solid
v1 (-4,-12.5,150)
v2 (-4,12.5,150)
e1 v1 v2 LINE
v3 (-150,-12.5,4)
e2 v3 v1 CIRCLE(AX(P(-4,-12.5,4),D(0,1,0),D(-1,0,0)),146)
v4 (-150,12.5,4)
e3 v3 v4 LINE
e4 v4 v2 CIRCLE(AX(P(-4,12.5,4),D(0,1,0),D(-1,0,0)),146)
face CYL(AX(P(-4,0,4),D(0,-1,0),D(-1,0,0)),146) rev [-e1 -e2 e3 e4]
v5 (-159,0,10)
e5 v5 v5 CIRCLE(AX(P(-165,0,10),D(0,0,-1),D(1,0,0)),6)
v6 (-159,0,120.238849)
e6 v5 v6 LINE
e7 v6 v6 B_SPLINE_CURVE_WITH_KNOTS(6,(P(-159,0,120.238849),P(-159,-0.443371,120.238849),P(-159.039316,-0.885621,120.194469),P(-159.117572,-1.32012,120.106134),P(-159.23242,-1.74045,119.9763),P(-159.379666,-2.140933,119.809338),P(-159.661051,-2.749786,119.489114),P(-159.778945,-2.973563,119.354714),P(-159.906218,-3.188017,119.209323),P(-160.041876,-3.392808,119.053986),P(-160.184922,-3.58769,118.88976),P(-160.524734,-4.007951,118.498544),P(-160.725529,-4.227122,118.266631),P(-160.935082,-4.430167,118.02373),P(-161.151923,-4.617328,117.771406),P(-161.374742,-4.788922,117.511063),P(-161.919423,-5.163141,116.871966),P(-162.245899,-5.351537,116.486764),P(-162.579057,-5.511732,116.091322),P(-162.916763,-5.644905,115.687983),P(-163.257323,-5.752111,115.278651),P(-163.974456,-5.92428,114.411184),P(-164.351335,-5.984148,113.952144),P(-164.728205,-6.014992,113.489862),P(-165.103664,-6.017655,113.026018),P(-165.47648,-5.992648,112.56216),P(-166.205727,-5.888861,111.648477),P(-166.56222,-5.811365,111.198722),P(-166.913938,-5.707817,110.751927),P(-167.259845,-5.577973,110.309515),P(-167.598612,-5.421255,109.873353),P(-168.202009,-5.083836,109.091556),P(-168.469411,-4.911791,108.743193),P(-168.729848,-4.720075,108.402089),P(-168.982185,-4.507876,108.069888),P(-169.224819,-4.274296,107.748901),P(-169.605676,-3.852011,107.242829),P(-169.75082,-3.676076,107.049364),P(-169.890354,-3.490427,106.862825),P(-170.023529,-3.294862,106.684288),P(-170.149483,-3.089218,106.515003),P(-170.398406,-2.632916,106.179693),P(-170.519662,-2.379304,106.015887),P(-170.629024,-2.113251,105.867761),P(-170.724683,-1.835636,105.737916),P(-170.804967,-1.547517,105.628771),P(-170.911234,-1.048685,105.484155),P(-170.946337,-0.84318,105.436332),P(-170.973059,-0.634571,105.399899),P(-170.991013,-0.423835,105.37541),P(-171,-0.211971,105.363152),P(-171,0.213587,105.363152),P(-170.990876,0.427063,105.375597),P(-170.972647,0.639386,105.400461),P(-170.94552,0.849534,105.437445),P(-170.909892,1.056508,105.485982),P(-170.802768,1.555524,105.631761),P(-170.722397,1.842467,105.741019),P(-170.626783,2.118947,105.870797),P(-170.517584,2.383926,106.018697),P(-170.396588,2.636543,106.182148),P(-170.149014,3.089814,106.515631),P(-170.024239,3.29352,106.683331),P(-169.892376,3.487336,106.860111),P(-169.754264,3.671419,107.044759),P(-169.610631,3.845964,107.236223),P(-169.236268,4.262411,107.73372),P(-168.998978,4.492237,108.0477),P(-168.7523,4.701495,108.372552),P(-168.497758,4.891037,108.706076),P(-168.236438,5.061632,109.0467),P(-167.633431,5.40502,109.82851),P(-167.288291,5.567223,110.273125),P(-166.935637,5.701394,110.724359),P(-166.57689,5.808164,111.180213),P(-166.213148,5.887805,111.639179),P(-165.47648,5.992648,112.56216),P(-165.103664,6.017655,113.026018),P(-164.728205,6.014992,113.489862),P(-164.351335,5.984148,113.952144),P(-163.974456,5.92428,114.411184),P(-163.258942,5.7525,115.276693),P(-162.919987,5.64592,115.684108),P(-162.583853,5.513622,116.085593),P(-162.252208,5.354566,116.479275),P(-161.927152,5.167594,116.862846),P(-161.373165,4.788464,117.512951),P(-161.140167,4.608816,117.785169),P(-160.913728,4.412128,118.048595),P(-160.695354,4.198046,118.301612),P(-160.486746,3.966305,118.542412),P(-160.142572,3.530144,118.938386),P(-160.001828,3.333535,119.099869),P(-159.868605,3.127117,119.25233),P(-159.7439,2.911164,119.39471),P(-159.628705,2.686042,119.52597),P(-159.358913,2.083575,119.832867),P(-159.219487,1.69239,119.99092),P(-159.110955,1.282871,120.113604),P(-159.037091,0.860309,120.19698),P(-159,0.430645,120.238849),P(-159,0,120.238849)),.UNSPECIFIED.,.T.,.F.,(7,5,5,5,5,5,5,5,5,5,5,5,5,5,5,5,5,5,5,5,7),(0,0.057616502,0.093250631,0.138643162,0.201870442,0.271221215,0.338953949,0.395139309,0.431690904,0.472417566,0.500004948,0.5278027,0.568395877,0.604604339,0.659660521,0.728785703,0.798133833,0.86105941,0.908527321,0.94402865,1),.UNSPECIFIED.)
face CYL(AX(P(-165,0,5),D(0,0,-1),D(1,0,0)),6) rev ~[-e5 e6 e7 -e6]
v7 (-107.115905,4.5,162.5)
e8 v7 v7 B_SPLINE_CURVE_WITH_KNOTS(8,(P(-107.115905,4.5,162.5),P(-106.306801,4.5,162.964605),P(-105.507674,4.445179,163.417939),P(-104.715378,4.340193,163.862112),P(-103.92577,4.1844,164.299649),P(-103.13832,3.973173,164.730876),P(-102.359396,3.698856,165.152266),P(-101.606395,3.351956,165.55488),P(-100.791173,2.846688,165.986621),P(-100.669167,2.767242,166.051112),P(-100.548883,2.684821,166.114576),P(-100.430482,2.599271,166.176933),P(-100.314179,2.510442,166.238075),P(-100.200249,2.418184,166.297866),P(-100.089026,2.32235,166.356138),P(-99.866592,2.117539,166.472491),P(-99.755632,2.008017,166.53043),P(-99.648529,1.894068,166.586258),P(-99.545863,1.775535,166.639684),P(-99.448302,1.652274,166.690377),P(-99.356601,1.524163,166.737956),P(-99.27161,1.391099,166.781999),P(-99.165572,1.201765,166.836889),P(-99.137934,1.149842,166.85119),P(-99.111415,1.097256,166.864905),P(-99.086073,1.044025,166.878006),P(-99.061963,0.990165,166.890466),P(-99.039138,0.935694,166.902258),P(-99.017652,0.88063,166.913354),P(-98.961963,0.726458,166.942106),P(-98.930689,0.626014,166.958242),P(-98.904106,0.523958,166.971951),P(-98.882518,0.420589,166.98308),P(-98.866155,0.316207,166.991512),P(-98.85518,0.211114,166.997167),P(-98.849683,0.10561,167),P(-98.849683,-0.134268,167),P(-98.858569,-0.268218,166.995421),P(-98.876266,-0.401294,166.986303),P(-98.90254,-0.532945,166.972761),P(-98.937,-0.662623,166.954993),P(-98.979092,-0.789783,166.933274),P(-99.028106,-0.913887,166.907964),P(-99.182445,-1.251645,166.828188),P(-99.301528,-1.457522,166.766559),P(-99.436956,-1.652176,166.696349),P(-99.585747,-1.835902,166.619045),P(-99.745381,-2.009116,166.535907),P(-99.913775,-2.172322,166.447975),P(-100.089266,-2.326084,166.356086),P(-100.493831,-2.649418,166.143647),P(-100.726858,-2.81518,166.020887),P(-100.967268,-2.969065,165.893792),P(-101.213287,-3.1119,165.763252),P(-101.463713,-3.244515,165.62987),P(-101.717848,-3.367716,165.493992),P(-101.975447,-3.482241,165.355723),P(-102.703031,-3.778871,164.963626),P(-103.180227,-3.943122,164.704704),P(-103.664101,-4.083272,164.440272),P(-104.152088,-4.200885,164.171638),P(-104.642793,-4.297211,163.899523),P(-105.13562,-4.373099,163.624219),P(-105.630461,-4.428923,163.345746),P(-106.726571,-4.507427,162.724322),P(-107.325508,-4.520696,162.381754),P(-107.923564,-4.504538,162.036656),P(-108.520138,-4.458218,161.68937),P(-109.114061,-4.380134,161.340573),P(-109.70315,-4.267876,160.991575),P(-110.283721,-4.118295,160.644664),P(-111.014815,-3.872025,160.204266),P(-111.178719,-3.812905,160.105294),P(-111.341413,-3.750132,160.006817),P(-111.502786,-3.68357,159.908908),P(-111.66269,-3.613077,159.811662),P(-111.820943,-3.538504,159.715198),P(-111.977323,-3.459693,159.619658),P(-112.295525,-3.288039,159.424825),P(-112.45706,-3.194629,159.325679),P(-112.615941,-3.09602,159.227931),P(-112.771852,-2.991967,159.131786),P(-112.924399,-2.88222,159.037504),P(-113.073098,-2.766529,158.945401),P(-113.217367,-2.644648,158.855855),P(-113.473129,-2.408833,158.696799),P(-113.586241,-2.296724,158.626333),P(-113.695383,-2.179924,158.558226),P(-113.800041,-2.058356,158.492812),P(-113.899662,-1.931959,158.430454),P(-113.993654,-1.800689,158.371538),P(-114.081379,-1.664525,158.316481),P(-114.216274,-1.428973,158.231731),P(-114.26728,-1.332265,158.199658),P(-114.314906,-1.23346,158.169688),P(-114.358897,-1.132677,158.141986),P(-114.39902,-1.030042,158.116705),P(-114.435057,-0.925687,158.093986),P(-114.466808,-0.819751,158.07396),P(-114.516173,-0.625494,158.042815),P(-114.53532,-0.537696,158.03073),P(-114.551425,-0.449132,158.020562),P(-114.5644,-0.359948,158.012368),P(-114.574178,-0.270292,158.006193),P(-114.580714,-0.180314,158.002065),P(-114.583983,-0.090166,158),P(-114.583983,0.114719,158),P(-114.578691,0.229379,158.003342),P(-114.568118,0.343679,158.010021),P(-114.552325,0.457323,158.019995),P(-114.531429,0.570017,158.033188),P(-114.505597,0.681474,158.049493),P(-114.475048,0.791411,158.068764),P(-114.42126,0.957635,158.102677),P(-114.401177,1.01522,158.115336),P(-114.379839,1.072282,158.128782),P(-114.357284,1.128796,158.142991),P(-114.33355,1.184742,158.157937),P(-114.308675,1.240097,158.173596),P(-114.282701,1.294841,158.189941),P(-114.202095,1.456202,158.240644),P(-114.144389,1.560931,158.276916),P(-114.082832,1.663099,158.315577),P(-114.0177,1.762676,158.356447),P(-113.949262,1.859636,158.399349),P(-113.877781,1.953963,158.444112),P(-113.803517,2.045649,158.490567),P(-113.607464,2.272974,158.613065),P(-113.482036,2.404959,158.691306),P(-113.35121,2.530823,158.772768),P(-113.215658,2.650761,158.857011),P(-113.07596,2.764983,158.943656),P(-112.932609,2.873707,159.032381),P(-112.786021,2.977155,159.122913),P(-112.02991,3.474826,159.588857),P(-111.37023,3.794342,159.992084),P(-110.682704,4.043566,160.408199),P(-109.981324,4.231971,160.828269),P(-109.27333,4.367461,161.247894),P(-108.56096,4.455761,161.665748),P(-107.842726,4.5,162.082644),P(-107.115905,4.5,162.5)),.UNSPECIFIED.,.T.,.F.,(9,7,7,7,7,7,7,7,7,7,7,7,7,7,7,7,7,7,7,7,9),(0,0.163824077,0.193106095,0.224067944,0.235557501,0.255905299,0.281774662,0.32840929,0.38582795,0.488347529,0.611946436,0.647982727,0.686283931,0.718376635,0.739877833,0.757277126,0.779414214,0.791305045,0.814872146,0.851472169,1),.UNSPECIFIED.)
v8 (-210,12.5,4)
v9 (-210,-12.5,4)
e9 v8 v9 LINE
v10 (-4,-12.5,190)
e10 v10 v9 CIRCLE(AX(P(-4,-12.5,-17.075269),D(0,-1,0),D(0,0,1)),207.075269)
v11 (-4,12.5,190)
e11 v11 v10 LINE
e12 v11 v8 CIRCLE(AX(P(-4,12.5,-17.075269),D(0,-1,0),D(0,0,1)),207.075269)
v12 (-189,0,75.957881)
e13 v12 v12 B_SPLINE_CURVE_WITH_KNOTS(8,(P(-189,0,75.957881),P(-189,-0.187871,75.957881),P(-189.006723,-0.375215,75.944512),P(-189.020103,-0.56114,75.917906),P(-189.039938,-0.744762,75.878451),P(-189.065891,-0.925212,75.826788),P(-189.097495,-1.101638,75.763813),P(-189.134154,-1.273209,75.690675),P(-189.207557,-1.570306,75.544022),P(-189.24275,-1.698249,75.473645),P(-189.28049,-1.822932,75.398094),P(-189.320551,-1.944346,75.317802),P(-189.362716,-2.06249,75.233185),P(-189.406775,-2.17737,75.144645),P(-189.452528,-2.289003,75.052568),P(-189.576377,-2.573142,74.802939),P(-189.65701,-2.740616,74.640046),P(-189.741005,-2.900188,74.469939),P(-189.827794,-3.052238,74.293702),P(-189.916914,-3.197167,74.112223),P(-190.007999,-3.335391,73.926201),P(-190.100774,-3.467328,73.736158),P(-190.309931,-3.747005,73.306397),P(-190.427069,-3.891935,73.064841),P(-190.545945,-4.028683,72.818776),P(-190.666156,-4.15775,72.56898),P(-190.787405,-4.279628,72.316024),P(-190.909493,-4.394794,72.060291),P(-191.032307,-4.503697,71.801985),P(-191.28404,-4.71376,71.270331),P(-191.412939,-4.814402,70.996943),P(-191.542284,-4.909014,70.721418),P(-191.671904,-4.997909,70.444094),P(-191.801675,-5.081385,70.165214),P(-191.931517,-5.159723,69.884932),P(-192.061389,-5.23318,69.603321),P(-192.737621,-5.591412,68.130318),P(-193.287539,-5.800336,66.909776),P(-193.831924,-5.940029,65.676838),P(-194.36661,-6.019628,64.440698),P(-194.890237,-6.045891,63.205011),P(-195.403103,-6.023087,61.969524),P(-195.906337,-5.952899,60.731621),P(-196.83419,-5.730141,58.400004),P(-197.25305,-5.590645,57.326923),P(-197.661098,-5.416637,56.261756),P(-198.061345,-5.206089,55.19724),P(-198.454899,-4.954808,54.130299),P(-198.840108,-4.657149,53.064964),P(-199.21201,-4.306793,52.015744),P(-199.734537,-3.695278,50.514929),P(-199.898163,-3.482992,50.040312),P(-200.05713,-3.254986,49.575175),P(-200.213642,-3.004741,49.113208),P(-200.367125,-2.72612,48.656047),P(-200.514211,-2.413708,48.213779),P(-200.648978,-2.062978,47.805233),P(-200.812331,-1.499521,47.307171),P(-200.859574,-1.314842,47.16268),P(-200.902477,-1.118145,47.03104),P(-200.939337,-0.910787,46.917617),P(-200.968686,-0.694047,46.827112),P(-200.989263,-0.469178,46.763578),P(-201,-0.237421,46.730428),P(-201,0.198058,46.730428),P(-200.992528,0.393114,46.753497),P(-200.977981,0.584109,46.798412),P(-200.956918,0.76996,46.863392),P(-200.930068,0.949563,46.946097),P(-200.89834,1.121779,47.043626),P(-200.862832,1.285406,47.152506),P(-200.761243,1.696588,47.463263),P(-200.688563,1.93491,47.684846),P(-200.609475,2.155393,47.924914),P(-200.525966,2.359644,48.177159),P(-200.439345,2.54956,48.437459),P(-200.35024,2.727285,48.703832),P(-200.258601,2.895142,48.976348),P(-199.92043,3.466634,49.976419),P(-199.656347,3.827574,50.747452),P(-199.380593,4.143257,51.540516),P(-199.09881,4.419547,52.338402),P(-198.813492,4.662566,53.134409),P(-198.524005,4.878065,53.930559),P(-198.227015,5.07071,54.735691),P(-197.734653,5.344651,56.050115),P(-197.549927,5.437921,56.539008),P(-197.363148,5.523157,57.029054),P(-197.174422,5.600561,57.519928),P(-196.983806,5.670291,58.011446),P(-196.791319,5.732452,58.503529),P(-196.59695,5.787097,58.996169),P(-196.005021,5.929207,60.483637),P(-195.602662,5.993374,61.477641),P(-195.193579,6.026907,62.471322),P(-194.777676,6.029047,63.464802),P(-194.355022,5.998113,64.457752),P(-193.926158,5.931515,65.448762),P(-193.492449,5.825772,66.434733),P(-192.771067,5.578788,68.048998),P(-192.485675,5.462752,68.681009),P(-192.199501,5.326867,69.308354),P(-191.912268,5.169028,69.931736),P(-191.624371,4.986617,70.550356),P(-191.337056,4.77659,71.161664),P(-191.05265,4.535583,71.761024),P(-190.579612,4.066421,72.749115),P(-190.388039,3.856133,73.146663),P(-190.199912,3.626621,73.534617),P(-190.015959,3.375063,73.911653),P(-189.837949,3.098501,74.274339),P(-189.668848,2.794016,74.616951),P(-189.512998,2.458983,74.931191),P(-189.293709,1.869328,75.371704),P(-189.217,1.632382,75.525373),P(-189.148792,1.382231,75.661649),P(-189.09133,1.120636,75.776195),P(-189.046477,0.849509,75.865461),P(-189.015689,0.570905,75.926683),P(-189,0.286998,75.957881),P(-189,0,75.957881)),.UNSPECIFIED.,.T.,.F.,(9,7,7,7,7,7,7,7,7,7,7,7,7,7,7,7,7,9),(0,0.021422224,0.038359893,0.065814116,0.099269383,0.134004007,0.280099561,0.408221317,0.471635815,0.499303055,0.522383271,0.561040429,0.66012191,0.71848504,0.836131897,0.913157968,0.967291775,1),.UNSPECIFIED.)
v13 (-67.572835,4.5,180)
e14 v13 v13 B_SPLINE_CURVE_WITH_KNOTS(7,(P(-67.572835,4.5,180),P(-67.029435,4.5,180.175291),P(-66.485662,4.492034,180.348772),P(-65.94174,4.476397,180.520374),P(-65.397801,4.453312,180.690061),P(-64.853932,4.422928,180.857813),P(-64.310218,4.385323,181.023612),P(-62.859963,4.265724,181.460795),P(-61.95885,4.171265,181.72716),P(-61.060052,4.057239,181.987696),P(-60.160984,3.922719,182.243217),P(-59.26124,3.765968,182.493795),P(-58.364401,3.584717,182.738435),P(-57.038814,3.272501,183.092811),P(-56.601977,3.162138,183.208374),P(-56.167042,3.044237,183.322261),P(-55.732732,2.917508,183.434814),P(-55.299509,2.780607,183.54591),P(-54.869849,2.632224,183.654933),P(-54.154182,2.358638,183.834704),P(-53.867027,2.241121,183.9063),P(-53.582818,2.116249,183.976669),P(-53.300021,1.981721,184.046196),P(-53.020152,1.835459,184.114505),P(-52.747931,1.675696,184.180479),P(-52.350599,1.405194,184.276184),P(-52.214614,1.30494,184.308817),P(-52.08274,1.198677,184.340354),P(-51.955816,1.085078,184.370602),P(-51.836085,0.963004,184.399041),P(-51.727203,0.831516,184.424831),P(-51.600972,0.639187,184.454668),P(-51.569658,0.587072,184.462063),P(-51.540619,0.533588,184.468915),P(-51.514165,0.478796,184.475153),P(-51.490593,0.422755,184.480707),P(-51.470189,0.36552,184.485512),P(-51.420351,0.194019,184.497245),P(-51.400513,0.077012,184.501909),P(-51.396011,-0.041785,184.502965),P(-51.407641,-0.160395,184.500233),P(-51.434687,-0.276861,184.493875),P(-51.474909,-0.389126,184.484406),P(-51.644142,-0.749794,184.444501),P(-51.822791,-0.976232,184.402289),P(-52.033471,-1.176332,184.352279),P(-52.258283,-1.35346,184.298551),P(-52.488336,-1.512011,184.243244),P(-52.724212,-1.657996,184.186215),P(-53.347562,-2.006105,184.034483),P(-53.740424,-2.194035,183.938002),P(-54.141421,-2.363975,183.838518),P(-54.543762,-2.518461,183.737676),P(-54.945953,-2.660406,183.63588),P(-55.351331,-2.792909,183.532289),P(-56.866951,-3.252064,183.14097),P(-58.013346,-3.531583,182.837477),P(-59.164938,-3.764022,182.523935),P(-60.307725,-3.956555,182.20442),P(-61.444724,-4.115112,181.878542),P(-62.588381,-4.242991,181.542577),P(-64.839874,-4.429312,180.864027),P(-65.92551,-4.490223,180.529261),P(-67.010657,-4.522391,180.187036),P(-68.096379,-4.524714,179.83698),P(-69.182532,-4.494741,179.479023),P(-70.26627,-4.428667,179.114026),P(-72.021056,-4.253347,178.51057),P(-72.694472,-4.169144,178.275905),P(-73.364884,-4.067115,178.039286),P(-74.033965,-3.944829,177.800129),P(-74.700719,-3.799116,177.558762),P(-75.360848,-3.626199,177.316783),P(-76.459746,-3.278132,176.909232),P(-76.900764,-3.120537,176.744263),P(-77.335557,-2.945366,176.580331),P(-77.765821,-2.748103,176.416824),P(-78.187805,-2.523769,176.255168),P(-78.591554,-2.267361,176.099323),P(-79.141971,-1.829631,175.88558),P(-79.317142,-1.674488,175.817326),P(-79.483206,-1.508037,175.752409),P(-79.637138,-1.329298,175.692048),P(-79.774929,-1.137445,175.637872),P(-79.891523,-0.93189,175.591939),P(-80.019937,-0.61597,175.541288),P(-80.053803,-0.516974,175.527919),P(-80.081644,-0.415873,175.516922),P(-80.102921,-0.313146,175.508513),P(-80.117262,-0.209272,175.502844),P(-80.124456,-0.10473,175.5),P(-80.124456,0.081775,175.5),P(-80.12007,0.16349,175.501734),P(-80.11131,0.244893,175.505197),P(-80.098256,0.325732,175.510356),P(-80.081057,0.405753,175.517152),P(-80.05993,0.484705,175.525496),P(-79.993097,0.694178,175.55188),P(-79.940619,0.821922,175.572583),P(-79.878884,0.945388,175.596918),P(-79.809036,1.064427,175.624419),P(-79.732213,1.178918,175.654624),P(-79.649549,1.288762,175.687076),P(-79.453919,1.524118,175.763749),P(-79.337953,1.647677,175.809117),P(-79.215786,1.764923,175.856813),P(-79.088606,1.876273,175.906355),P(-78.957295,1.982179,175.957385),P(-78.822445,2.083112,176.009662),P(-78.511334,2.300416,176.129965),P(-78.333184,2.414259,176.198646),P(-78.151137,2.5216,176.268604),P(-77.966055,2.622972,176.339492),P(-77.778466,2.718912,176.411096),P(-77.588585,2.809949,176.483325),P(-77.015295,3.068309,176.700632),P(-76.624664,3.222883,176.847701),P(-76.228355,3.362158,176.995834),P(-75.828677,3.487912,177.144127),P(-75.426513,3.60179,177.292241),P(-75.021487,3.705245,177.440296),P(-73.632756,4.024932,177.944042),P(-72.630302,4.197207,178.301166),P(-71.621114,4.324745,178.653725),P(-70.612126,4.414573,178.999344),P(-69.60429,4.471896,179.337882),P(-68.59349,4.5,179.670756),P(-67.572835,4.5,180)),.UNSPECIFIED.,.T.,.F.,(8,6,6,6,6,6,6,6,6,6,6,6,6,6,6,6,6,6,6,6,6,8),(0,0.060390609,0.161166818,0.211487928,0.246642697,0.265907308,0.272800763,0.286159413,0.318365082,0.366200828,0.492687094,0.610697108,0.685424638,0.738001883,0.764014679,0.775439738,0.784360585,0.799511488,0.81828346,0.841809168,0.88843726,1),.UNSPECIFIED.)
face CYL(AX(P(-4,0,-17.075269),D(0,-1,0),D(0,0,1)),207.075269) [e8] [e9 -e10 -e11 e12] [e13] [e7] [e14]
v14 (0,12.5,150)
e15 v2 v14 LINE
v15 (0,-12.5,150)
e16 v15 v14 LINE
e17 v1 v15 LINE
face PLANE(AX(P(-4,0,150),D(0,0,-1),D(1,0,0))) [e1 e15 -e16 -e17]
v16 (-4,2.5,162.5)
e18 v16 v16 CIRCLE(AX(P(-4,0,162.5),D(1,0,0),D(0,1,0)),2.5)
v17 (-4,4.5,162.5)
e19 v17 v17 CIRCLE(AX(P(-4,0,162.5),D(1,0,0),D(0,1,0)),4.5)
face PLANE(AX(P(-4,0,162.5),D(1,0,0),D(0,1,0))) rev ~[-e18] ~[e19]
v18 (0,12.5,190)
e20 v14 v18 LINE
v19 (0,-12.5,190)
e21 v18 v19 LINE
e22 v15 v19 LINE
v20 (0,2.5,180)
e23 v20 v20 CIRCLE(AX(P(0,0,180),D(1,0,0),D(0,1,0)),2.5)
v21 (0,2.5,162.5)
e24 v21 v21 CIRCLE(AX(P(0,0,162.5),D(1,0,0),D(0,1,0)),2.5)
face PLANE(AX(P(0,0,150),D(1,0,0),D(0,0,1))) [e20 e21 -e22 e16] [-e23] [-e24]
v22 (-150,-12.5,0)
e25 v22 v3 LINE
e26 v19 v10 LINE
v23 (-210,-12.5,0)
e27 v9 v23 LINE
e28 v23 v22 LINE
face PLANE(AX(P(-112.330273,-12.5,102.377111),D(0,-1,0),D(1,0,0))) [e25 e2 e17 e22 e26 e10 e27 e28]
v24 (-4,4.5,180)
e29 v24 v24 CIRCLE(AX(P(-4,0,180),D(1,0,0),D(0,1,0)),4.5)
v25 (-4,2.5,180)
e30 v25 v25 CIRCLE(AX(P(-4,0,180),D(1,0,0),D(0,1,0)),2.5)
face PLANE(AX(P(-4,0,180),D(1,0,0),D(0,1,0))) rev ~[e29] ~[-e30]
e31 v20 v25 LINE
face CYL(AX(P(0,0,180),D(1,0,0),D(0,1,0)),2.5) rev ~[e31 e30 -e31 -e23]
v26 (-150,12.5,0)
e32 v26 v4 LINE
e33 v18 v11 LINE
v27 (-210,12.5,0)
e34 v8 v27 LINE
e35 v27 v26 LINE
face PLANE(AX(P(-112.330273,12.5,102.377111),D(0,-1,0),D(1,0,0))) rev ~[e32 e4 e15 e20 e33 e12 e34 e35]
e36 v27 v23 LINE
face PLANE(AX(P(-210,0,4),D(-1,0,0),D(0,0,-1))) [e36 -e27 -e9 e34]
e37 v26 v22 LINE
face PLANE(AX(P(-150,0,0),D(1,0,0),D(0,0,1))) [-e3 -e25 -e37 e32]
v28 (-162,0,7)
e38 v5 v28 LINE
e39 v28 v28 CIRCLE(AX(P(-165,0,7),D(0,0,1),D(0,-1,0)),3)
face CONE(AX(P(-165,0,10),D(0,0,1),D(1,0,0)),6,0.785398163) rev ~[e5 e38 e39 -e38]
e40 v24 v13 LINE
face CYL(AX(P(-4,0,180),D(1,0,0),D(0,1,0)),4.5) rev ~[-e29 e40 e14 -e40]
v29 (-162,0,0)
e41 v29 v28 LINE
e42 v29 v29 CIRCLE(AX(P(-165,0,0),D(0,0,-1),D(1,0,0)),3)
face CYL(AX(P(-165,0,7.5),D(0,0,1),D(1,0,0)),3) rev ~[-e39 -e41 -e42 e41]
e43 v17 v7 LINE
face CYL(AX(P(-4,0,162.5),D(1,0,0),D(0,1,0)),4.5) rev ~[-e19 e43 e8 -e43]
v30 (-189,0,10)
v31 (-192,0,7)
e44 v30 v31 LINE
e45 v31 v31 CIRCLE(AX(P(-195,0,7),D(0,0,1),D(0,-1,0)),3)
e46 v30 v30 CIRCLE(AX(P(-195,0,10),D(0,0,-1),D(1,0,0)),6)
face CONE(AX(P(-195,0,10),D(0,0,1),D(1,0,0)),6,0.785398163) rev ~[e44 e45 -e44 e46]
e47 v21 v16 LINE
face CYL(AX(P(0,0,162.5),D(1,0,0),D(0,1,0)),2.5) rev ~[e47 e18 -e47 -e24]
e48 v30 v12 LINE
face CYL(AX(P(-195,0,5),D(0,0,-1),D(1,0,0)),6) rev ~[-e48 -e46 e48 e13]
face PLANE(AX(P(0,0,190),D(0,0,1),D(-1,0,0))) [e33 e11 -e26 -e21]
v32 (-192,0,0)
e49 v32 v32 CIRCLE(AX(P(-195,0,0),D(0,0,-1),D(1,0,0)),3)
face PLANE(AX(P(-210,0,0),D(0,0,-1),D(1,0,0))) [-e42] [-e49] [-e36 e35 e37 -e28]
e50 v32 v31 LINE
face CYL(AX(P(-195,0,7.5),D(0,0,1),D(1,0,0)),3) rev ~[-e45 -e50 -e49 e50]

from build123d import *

# Parameters (mm, degrees)
F1_DEPTH      = 12.5
F2_R          = 2.5
F3_DEPTH      = 4
F4_R          = 4.5
F5_DEPTH      = 206.001
F6_R          = 3
F7_DEPTH      = 5
F8_R          = 6
F9_DEPTH      = 185.0010001
F10_S5_R      = 3
F10_T6_DEPTH  = 10
F10_S11_R     = 3
F10_T12_DEPTH = 10


# Not quite as in the source:
# - a fillet or chamfer that OpenCascade refuses, or shapes differently, is made with other operations: its cross-section is extruded or revolved along the edge and cut away or added


with BuildPart() as f1:
    # F0 (on Front) → F1 (new body, symmetric)
    with BuildSketch(Plane.XZ):
        with BuildLine():
            Line((0, 150), (0, 190))
            Line((0, 190), (-4, 190))
            ThreePointArc((-4, 190), (-142.7731962592, 136.6197765021), (-210, 4))
            Line((-210, 4), (-210, 0))
            Line((-210, 0), (-150, 0))
            Line((-150, 0), (-150, 4))
            ThreePointArc((-150, 4), (-107.2375900532, 107.2375900532), (-4, 150))
            Line((-4, 150), (0, 150))
        make_face()
    extrude(amount=F1_DEPTH, both=True)

    # F2 (on face) → F3 (cut)
    with BuildSketch(Plane.YZ):
        with Locations((0, 180)):
            Circle(F2_R)
        with Locations((0, 162.5)):
            Circle(F2_R)
    extrude(amount=-F3_DEPTH, mode=Mode.SUBTRACT)

    # F4 (on face) → F5 (cut, through all)
    with BuildSketch(Plane.YZ.offset(-4)):
        with Locations((0, 180)):
            Circle(F4_R)
        with Locations((0, 162.5)):
            Circle(F4_R)
    extrude(amount=-F5_DEPTH, mode=Mode.SUBTRACT)

    # F6 (on face) → F7 (cut)
    with BuildSketch(Plane(origin=(0, 0, 0), x_dir=(1, 0, 0), z_dir=(0, 0, -1))):
        with Locations((-165, 0)):
            Circle(F6_R)
        with Locations((-195, 0)):
            Circle(F6_R)
    extrude(amount=-F7_DEPTH, mode=Mode.SUBTRACT)

    # F8 (on face) → F9 (cut, through all)
    with BuildSketch(Plane(origin=(0, 0, 5), x_dir=(1, 0, 0), z_dir=(0, 0, -1))):
        with Locations((-165, 0)):
            Circle(F8_R)
        with Locations((-195, 0)):
            Circle(F8_R)
    extrude(amount=-F9_DEPTH, mode=Mode.SUBTRACT)

    # F10: chamfer of 5 on 2 edges, made by hand


with BuildPart() as f10_tool2:
    # F10_s3 → F10_t4 (revolve)
    with BuildSketch(Plane.XZ):
        Polygon((-189, 10), (-194, 5), (-189, 5), align=None)
    revolve(axis=Axis((-195, 0, 5), (0, 0, -1)))

    # F10_s5 → F10_t6 (cut, symmetric)
    with BuildSketch(Plane.XY.offset(7.5)):
        with Locations((-195, 0)):
            Circle(F10_S5_R)
    extrude(amount=F10_T6_DEPTH, both=True, mode=Mode.SUBTRACT)


with BuildPart() as f1_1:
    add(f1.part)

    # F10_t1: union F10_tool2
    add(f10_tool2.part)


with BuildPart() as f10_tool8:
    # F10_s9 → F10_t10 (revolve)
    with BuildSketch(Plane.XZ):
        Polygon((-159, 10), (-164, 5), (-159, 5), align=None)
    revolve(axis=Axis((-165, 0, 5), (0, 0, -1)))

    # F10_s11 → F10_t12 (cut, symmetric)
    with BuildSketch(Plane.XY.offset(7.5)):
        with Locations((-165, 0)):
            Circle(F10_S11_R)
    extrude(amount=F10_T12_DEPTH, both=True, mode=Mode.SUBTRACT)


with BuildPart() as f1_2:
    add(f1_1.part)

    # F10_t7: union F10_tool8
    add(f10_tool8.part)


solid = f1_2.part
